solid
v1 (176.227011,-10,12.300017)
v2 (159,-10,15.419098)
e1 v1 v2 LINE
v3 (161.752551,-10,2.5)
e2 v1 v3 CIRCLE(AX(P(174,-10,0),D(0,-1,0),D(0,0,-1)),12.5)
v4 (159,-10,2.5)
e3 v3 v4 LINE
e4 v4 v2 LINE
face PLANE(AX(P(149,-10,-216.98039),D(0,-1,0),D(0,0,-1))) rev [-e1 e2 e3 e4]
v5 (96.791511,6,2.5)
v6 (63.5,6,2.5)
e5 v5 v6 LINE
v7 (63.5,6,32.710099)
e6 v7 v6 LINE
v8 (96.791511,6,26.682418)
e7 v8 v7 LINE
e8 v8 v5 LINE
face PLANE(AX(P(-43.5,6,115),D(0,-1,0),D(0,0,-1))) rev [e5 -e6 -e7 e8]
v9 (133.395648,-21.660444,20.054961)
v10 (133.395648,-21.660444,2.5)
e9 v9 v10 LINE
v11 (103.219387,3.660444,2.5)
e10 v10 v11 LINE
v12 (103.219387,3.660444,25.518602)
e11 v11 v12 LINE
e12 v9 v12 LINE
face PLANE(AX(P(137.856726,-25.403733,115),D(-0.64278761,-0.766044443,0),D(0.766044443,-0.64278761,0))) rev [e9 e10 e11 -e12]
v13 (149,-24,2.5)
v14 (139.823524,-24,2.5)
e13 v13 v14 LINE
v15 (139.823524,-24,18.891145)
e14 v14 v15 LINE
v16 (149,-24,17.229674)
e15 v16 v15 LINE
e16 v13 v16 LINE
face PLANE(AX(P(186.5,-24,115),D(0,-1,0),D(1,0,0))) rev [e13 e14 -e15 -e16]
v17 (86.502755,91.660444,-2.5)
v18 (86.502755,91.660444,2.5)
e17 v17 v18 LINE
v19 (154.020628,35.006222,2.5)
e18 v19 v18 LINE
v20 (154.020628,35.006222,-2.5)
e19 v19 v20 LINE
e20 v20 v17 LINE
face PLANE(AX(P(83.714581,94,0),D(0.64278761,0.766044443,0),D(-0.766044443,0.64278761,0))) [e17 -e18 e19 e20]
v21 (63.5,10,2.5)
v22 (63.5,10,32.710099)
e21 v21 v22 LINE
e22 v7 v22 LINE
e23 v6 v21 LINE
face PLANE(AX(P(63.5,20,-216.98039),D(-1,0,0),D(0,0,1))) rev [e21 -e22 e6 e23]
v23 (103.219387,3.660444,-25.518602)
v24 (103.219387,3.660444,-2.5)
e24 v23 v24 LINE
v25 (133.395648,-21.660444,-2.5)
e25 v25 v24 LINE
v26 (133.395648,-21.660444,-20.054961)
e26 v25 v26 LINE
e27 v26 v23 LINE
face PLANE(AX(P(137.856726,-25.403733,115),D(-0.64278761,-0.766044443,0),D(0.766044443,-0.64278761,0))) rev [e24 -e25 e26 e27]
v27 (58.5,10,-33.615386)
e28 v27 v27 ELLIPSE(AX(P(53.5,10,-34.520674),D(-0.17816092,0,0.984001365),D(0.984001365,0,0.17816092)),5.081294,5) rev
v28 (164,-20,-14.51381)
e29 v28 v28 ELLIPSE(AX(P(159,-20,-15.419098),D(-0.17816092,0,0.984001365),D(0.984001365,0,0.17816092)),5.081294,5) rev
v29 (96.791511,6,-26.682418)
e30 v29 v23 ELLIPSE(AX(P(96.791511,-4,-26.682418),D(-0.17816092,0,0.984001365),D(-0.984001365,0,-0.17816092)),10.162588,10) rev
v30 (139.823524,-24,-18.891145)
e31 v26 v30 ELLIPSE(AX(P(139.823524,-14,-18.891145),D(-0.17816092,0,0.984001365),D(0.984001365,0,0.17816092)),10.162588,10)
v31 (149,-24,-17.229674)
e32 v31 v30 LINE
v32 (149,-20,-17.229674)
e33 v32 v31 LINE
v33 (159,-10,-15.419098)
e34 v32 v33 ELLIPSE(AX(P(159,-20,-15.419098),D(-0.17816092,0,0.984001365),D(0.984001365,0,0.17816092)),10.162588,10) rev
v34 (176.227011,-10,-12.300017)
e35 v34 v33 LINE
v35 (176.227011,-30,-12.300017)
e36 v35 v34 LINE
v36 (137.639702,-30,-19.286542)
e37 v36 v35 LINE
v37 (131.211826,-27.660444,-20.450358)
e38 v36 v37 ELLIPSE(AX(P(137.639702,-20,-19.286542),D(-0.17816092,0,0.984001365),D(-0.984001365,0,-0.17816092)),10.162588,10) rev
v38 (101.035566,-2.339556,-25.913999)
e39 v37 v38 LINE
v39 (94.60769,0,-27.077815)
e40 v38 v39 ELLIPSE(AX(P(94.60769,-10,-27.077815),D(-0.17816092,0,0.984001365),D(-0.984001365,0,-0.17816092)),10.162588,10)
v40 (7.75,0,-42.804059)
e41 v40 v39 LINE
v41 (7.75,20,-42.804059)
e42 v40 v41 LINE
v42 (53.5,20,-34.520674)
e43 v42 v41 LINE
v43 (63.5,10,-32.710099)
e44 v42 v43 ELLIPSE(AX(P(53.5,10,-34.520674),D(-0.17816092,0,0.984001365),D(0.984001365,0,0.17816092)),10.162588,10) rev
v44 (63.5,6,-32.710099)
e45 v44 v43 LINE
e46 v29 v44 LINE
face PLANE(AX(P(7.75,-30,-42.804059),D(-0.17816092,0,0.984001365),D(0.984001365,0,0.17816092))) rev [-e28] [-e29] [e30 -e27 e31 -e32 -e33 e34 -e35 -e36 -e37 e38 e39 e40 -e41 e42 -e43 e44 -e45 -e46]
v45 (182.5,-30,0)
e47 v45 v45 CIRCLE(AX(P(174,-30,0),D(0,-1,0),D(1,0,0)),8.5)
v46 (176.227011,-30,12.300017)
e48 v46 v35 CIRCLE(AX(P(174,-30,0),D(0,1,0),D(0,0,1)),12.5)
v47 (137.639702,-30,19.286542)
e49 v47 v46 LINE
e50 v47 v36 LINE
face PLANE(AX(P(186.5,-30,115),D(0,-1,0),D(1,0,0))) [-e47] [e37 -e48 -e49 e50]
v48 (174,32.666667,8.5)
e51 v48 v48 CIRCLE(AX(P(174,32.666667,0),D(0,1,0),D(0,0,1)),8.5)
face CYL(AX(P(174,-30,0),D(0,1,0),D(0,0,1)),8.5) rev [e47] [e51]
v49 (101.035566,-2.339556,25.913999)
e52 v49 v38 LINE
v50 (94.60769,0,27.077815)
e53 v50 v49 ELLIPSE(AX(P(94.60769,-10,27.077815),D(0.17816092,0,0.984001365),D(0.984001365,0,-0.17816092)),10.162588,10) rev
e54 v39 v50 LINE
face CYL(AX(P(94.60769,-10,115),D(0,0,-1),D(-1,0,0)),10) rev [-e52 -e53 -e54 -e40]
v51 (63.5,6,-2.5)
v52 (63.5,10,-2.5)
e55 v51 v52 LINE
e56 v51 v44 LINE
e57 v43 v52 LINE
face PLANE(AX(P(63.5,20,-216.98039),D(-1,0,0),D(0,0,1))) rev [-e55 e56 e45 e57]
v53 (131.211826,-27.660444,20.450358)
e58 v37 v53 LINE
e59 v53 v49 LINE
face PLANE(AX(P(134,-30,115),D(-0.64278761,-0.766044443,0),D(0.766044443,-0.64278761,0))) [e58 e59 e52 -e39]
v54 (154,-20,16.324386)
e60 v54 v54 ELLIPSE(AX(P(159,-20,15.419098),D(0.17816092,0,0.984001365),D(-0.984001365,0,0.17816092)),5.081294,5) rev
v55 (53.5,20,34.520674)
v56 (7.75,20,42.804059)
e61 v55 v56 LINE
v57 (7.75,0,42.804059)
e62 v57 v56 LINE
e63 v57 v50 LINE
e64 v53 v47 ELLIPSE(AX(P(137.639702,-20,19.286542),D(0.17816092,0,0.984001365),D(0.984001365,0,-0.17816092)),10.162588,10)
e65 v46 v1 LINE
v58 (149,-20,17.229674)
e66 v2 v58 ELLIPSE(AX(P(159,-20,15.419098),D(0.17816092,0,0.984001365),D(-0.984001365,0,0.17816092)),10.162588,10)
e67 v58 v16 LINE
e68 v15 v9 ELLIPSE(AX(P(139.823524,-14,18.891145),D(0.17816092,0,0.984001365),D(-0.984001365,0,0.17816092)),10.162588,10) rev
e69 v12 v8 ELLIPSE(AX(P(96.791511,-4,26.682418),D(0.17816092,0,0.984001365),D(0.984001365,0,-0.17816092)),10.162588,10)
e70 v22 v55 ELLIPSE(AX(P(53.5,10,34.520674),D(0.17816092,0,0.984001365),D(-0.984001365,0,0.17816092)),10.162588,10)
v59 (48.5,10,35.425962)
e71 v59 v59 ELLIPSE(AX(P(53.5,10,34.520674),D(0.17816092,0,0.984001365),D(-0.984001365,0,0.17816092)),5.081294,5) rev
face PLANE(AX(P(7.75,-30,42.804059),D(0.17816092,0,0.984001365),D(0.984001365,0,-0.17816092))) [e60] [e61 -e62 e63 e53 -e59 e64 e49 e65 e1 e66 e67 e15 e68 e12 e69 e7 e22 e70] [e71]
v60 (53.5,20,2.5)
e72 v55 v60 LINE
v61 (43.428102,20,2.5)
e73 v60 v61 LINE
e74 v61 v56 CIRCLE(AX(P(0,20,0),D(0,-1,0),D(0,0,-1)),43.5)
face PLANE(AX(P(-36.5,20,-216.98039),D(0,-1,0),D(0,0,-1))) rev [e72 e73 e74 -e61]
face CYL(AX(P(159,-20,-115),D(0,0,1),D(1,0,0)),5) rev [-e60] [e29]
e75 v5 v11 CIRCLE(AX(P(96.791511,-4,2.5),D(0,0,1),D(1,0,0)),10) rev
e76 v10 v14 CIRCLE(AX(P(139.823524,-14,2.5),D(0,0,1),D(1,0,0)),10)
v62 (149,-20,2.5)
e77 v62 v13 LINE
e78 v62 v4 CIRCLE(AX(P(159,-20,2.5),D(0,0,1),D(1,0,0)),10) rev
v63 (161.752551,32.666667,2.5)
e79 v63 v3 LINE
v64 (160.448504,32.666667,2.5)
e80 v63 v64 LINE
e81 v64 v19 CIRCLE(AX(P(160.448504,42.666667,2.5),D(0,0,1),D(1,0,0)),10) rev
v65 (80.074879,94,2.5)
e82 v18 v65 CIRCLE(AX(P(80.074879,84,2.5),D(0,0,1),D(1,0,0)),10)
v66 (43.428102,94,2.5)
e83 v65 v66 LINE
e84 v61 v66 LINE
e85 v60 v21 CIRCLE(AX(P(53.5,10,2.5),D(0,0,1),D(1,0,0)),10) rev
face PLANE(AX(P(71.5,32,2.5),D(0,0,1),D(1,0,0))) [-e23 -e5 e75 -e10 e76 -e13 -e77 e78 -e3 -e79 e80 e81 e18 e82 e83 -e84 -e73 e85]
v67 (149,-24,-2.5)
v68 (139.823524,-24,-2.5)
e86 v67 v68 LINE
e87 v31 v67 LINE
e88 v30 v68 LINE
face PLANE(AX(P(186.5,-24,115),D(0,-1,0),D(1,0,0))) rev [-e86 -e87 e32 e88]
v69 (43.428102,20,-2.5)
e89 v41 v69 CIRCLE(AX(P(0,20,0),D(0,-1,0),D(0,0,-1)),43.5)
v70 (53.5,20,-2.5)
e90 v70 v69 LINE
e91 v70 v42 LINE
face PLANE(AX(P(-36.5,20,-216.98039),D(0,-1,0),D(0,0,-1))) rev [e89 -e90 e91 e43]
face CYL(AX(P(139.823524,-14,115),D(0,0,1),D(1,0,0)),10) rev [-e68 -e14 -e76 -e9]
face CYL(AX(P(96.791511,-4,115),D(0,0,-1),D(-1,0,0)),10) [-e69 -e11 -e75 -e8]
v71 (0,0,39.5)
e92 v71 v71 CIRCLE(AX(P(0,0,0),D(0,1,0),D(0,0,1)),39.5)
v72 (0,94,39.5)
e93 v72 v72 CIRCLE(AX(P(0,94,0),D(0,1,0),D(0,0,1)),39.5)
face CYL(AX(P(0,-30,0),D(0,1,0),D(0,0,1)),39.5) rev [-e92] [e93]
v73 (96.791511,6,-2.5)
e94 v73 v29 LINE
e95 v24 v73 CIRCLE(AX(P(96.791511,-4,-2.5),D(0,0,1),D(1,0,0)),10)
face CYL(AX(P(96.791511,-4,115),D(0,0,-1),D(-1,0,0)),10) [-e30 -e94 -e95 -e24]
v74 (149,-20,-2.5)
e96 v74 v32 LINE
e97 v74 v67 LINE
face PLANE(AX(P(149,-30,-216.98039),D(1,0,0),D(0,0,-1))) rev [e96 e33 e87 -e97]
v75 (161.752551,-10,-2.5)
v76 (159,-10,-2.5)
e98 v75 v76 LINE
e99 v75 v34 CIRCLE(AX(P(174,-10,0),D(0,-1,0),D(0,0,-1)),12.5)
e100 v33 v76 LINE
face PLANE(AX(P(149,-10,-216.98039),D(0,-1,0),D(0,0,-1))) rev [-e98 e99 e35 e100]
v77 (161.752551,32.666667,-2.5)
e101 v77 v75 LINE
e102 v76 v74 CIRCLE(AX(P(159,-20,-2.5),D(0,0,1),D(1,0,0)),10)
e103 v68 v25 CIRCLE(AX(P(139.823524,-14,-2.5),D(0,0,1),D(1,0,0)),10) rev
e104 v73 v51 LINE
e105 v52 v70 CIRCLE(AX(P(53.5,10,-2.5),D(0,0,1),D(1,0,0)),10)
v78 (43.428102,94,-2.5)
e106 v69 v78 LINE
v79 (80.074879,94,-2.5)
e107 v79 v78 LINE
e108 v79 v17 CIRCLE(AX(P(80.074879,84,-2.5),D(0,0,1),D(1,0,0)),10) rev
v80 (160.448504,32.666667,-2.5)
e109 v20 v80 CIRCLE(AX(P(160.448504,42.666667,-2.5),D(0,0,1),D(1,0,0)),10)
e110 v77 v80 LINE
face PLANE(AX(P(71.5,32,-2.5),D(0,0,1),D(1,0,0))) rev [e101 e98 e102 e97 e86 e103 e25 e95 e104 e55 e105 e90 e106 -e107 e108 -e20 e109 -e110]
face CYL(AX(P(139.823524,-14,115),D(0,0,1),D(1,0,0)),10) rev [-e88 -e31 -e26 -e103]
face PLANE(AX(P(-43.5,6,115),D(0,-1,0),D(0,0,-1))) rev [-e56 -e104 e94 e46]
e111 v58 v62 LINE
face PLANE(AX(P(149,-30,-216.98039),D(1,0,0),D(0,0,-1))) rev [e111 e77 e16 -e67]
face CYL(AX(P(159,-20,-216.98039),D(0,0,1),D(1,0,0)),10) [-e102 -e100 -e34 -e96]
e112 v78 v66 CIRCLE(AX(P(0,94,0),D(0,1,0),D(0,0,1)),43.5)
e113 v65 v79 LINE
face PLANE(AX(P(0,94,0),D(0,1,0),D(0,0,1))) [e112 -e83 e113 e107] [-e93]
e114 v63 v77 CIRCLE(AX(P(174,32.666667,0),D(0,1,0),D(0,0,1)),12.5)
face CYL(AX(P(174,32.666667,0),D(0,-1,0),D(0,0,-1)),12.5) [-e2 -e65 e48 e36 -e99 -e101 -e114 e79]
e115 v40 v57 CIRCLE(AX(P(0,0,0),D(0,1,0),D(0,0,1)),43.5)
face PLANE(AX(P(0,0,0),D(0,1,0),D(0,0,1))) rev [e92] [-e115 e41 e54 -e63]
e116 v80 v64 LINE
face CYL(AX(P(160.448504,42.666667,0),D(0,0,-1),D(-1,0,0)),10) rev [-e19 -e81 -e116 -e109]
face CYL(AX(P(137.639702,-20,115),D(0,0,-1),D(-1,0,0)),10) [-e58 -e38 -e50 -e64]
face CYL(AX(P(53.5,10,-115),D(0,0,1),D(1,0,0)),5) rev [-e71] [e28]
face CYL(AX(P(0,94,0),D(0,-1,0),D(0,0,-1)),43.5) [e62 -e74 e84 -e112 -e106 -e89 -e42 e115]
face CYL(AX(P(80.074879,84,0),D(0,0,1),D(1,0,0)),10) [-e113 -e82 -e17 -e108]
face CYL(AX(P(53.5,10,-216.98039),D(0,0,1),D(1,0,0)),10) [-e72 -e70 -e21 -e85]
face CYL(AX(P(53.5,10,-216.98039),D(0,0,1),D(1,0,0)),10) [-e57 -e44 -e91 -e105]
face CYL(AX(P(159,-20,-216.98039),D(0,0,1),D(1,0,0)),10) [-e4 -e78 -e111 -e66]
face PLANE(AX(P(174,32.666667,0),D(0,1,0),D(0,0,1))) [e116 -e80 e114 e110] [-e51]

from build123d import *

# Parameters (mm, degrees)
SKETCH2_R                = 43.5
BOSS_EXTRUDE1_DEPTH      = 94
BOSS_EXTRUDE2_START      = -30
SKETCH2_3_R              = 12.5
BOSS_EXTRUDE2_DEPTH      = 62.666667
EXTRUDE_THIN1_DEPTH      = 115
BOSS_EXTRUDE3_START      = -230
SKETCH5_W                = 100
SKETCH5_H                = 20
SKETCH5_W_2              = 50
BOSS_EXTRUDE3_DEPTH      = 230
CUT_EXTRUDE2_DEPTH       = 319.334729
CUT_EXTRUDE2_DEPTH_BACK  = 319.334729
SKETCH5_3_R              = 5
CUT_EXTRUDE1_START       = -30
CUT_EXTRUDE1_OUTLINE_R   = 8.5
CUT_EXTRUDE1_OUTLINE_R_2 = 39.5
CUT_EXTRUDE1_DEPTH       = 124
RIB1_START               = -2.5
RIB1_DEPTH               = 5
FILLET1_R                = 10


# Read off the part's stored shape, not the designer's step: Cut-Extrude1, Rib1
with BuildPart() as part:
    # Sketch2 → Boss-Extrude1 (new body)
    with BuildSketch(Plane(origin=(0, 0, 0), x_dir=(1, 0, 0), z_dir=(0, 1, 0))):
        with Locations(Location((0, 0, 0), (0, 0, 270))):
            Circle(SKETCH2_R)
    extrude(amount=BOSS_EXTRUDE1_DEPTH)



with BuildPart() as body_2:
    # Sketch2<3> → Boss-Extrude2 (new body)
    with BuildSketch(Plane(origin=(0, 0, 0), x_dir=(1, 0, 0), z_dir=(0, 1, 0)).offset(BOSS_EXTRUDE2_START)):
        with Locations(Location((174, 0, 0), (0, 0, 270))):
            Circle(SKETCH2_3_R)
    extrude(amount=BOSS_EXTRUDE2_DEPTH)


with BuildPart() as part_1:
    add(part.part)

    add(body_2.part)  # Extrude-Thin1 merges body 2
    # Sketch3 → Extrude-Thin1 (add, symmetric)
    with BuildSketch(Plane.XY):
        Polygon((-43.5, 0), (98.247392, 0), (134, -30), (186.5, -30), (186.5, -24), (136.183821, -24), (100.431214, 6), (-43.5, 6), align=None)
    extrude(amount=EXTRUDE_THIN1_DEPTH, both=True)

    # Sketch5 → Boss-Extrude3 (add)
    with BuildSketch(Plane.XY.offset(115).offset(BOSS_EXTRUDE3_START)):
        with Locations((13.5, 10)):
            Rectangle(SKETCH5_W, SKETCH5_H)
        with Locations((174, -20)):
            Rectangle(SKETCH5_W_2, SKETCH5_H)
    extrude(amount=BOSS_EXTRUDE3_DEPTH)

    # Sketch5<3> → Cut-Extrude2 (cut, two sides: drawn at the far end of the back side and taken through both)
    with BuildSketch(Plane.XY.offset(115).offset(-CUT_EXTRUDE2_DEPTH_BACK)):
        with Locations((53.5, 10)):
            Circle(SKETCH5_3_R)
        with Locations((159, -20)):
            Circle(SKETCH5_3_R)
    extrude(amount=CUT_EXTRUDE2_DEPTH + CUT_EXTRUDE2_DEPTH_BACK, mode=Mode.SUBTRACT)

    # Cut-Extrude1 outline → Cut-Extrude1 (cut)
    with BuildSketch(Plane(origin=(0, 0, 0), x_dir=(1, 0, 0), z_dir=(0, 1, 0)).offset(CUT_EXTRUDE1_START)):
        with Locations((174, 0)):
            Circle(CUT_EXTRUDE1_OUTLINE_R)
        with BuildLine():
            ThreePointArc((-36.5, 23.664319), (-17.269135, 39.925267), (7.75, 42.804059))
            Line((7.75, 42.804059), (63.5, 32.710099))
            Line((63.5, 32.710099), (63.5, 115))
            Line((63.5, 115), (-36.5, 115))
            Line((-36.5, 115), (-36.5, 23.664319))
        make_face()
        with BuildLine():
            Line((63.5, -32.710099), (7.75, -42.804059))
            ThreePointArc((7.75, -42.804059), (-17.269135, -39.925267), (-36.5, -23.664319))
            Line((-36.5, -23.664319), (-36.5, -115))
            Line((-36.5, -115), (63.5, -115))
            Line((63.5, -115), (63.5, -32.710099))
        make_face()
        with BuildLine():
            ThreePointArc((-43.5, 0), (-41.713307, 12.338963), (-36.5, 23.664319))
            Line((-36.5, 23.664319), (-36.5, 115))
            Line((-36.5, 115), (-43.5, 115))
            Line((-43.5, 115), (-43.5, 0))
        make_face()
        Polygon((63.5, 115), (63.5, 32.710099), (149, 17.229674), (149, 115), align=None)
        with BuildLine():
            Line((-36.5, -115), (-36.5, -23.664319))
            ThreePointArc((-36.5, -23.664319), (-41.713307, -12.338963), (-43.5, 0))
            Line((-43.5, 0), (-43.5, -115))
            Line((-43.5, -115), (-36.5, -115))
        make_face()
        Polygon((149, -17.229674), (63.5, -32.710099), (63.5, -115), (149, -115), align=None)
        with BuildLine():
            Line((149, 115), (149, 17.229674))
            Line((149, 17.229674), (176.227011, 12.300017))
            ThreePointArc((176.227011, 12.300017), (183.593947, 8.012876), (186.5, 0))
            ThreePointArc((186.5, 0), (183.593947, -8.012876), (176.227011, -12.300017))
            Line((176.227011, -12.300017), (149, -17.229674))
            Line((149, -17.229674), (149, -115))
            Line((149, -115), (199, -115))
            Line((199, -115), (199, 115))
            Line((199, 115), (149, 115))
        make_face()
        Circle(CUT_EXTRUDE1_OUTLINE_R_2)
    extrude(amount=CUT_EXTRUDE1_DEPTH, mode=Mode.SUBTRACT)

    # Rib1 outline → Rib1 (add)
    with BuildSketch(Plane.XY.offset(RIB1_START)):
        Polygon((156.808801, 32.666667), (83.714581, 94), (42, 94), (42, 20), (63.5, 20), (63.5, 6), (100.431214, 6), (136.183821, -24), (149, -24), (149, -10), (163, -10), (163, 32.666667), align=None)
    extrude(amount=RIB1_DEPTH)

    # Fillet1
    # the kernel refuses this fillet: 10 mm, written as the material it adds along each edge
    with BuildSketch(Plane(origin=(98.247392, 0, -35.518075), x_dir=(-1, 0, 0), z_dir=(0, 0, 1))) as fillet1_piece_1_section:
        with BuildLine():
            CenterArc((FILLET1_R * 0.363970234266, FILLET1_R), FILLET1_R, 230, 40)
            Line((-FILLET1_R * 0.27881737542, FILLET1_R * 0.233955556881), (0, 0))
            Line((0, 0), (FILLET1_R * 0.363970234266, 0))
        make_face()
    fillet1_piece_1 = extrude(amount=71.03615, mode=Mode.PRIVATE)
    fillet1_piece_1 = split(fillet1_piece_1, bisect_by=Plane(origin=(102.693133, -0.478631, -25.613884), z_dir=(-0.17816091954075147, 0, 0.9840013652167328)), keep=Keep.TOP, mode=Mode.PRIVATE)
    fillet1_piece_1 = split(fillet1_piece_1, bisect_by=Plane(origin=(102.693133, -0.478631, 25.613884), z_dir=(-0.17816091954075147, 0, -0.9840013652167328)), keep=Keep.TOP, mode=Mode.PRIVATE)
    add(fillet1_piece_1)
    with BuildSketch(Plane(origin=(136.183821, -24, -6.599256), x_dir=(-0.7660444431189806, 0.6427876096865363, 0), z_dir=(0, 0, 1))) as fillet1_piece_2_section:
        with BuildLine():
            CenterArc((FILLET1_R * 0.363970234266, -FILLET1_R), FILLET1_R, 90, 40)
            Line((-FILLET1_R * 0.27881737542, -FILLET1_R * 0.233955556881), (0, 0))
            Line((0, 0), (FILLET1_R * 0.363970234266, 0))
        make_face()
    fillet1_piece_2 = extrude(amount=35.248652, mode=Mode.PRIVATE)
    fillet1_piece_2 = split(fillet1_piece_2, bisect_by=Plane(origin=(140.141098, -23.515892, 18.833646), z_dir=(-0.17816091954075147, 0, -0.9840013652167328)), keep=Keep.TOP, mode=Mode.PRIVATE)
    add(fillet1_piece_2)
    with BuildSketch(Plane(origin=(136.183821, -24, -28.649397), x_dir=(1, 0, 0), z_dir=(0, 0, 1))) as fillet1_piece_3_section:
        with BuildLine():
            CenterArc((FILLET1_R * 0.363970234266, FILLET1_R), FILLET1_R, 230, 40)
            Line((-FILLET1_R * 0.27881737542, FILLET1_R * 0.233955556881), (0, 0))
            Line((0, 0), (FILLET1_R * 0.363970234266, 0))
        make_face()
    fillet1_piece_3 = extrude(amount=35.248652, mode=Mode.PRIVATE)
    fillet1_piece_3 = split(fillet1_piece_3, bisect_by=Plane(origin=(137.827829, -23.50738, -19.252481), z_dir=(-0.17816091954075147, 0, 0.9840013652167328)), keep=Keep.TOP, mode=Mode.PRIVATE)
    add(fillet1_piece_3)
    with BuildSketch(Plane(origin=(156.808801, 32.666667, -2.5), x_dir=(1, 0, 0), z_dir=(0, 0, 1))) as fillet1_piece_4:
        with BuildLine():
            CenterArc((FILLET1_R * 0.363970234268, FILLET1_R), FILLET1_R, 230, 40)
            Line((-FILLET1_R * 0.278817375421, FILLET1_R * 0.233955556883), (0, 0))
            Line((0, 0), (FILLET1_R * 0.363970234268, 0))
        make_face()
    extrude(amount=5)
    # the kernel refuses this fillet: 10 mm, written as the material it takes off along each edge
    with BuildSketch(Plane(origin=(100.431214, 6, 35.122678), x_dir=(-1, 0, 0), z_dir=(0, 0, -1))) as fillet1_2_piece_1:
        with BuildLine():
            CenterArc((FILLET1_R * 0.363970234266, -FILLET1_R), FILLET1_R, 90, 40)
            Line((-FILLET1_R * 0.27881737542, -FILLET1_R * 0.233955556881), (0, 0))
            Line((0, 0), (FILLET1_R * 0.363970234266, 0))
        make_face()
    extrude(amount=32.622678, mode=Mode.SUBTRACT)
    with BuildSketch(Plane(origin=(100.431214, 6, 35.122678), x_dir=(-1, 0, 0), z_dir=(0, 0, -1))) as fillet1_2_piece_2_section:
        with BuildLine():
            CenterArc((FILLET1_R * 0.363970234266, -FILLET1_R), FILLET1_R, 90, 40)
            Line((-FILLET1_R * 0.27881737542, -FILLET1_R * 0.233955556881), (0, 0))
            Line((0, 0), (FILLET1_R * 0.363970234266, 0))
        make_face()
    fillet1_2_piece_2 = extrude(amount=41.721934, mode=Mode.PRIVATE)
    fillet1_2_piece_2 = split(fillet1_2_piece_2, bisect_by=Plane(origin=(100.255013, 5.515892, -2.5), z_dir=(0, 0, -1)), keep=Keep.TOP, mode=Mode.PRIVATE)
    add(fillet1_2_piece_2, mode=Mode.SUBTRACT)
    with BuildSketch(Plane(origin=(134, -30, -29.044794), x_dir=(-0.766044443118982, 0.6427876096865346, 0), z_dir=(0, 0, 1))) as fillet1_2_piece_3:
        with BuildLine():
            CenterArc((FILLET1_R * 0.363970234266, -FILLET1_R), FILLET1_R, 90, 40)
            Line((-FILLET1_R * 0.27881737542, -FILLET1_R * 0.233955556881), (0, 0))
            Line((0, 0), (FILLET1_R * 0.363970234266, 0))
        make_face()
    extrude(amount=58.089588, mode=Mode.SUBTRACT)
    with BuildSketch(Plane(origin=(149, -10, -22.5), x_dir=(0, -1, 0), z_dir=(0, 0, 1))) as fillet1_2_piece_4_section:
        with BuildLine():
            CenterArc((FILLET1_R, FILLET1_R), FILLET1_R, 180, 90)
            Line((0, FILLET1_R), (0, 0))
            Line((0, 0), (FILLET1_R, 0))
        make_face()
    fillet1_2_piece_4 = extrude(amount=64.729674, mode=Mode.PRIVATE)
    fillet1_2_piece_4 = split(fillet1_2_piece_4, bisect_by=Plane(origin=(151.263951, -12.263951, -2.5), z_dir=(0, 0, -1)), keep=Keep.TOP, mode=Mode.PRIVATE)
    add(fillet1_2_piece_4, mode=Mode.SUBTRACT)
    with BuildSketch(Plane(origin=(149, -10, 2.5), x_dir=(0, -1, 0), z_dir=(0, 0, 1))) as fillet1_2_piece_5:
        with BuildLine():
            CenterArc((FILLET1_R, FILLET1_R), FILLET1_R, 180, 90)
            Line((0, FILLET1_R), (0, 0))
            Line((0, 0), (FILLET1_R, 0))
        make_face()
    extrude(amount=39.729674, mode=Mode.SUBTRACT)
    with BuildSketch(Plane(origin=(100.431214, 6, 6.599256), x_dir=(0.7660444431189812, -0.6427876096865356, 0), z_dir=(0, 0, -1))) as fillet1_2_piece_6_section:
        with BuildLine():
            CenterArc((FILLET1_R * 0.363970234266, FILLET1_R), FILLET1_R, 230, 40)
            Line((-FILLET1_R * 0.27881737542, FILLET1_R * 0.233955556881), (0, 0))
            Line((0, 0), (FILLET1_R * 0.363970234266, 0))
        make_face()
    fillet1_2_piece_6 = extrude(amount=41.721934, mode=Mode.PRIVATE)
    fillet1_2_piece_6 = split(fillet1_2_piece_6, bisect_by=Plane(origin=(100.255013, 5.515892, 2.5), z_dir=(0, 0, 1)), keep=Keep.TOP, mode=Mode.PRIVATE)
    add(fillet1_2_piece_6, mode=Mode.SUBTRACT)
    with BuildSketch(Plane(origin=(100.431214, 6, -2.5), x_dir=(0.7660444431189812, -0.6427876096865356, 0), z_dir=(0, 0, -1))) as fillet1_2_piece_7:
        with BuildLine():
            CenterArc((FILLET1_R * 0.363970234266, FILLET1_R), FILLET1_R, 230, 40)
            Line((-FILLET1_R * 0.27881737542, FILLET1_R * 0.233955556881), (0, 0))
            Line((0, 0), (FILLET1_R * 0.363970234266, 0))
        make_face()
    extrude(amount=32.622678, mode=Mode.SUBTRACT)
    with BuildSketch(Plane(origin=(63.5, 20, -22.5), x_dir=(-1, 0, 0), z_dir=(0, 0, 1))) as fillet1_2_piece_8_section:
        with BuildLine():
            CenterArc((FILLET1_R, FILLET1_R), FILLET1_R, 180, 90)
            Line((0, FILLET1_R), (0, 0))
            Line((0, 0), (FILLET1_R, 0))
        make_face()
    fillet1_2_piece_8 = extrude(amount=80.210099, mode=Mode.PRIVATE)
    fillet1_2_piece_8 = split(fillet1_2_piece_8, bisect_by=Plane(origin=(61.236049, 17.736049, -2.5), z_dir=(0, 0, -1)), keep=Keep.TOP, mode=Mode.PRIVATE)
    add(fillet1_2_piece_8, mode=Mode.SUBTRACT)
    with BuildSketch(Plane(origin=(63.5, 20, 2.5), x_dir=(-1, 0, 0), z_dir=(0, 0, 1))) as fillet1_2_piece_9:
        with BuildLine():
            CenterArc((FILLET1_R, FILLET1_R), FILLET1_R, 180, 90)
            Line((0, FILLET1_R), (0, 0))
            Line((0, 0), (FILLET1_R, 0))
        make_face()
    extrude(amount=55.210099, mode=Mode.SUBTRACT)
    with BuildSketch(Plane(origin=(83.714581, 94, -11.599256), x_dir=(-1, 0, 0), z_dir=(0, 0, 1))) as fillet1_2_piece_10:
        with BuildLine():
            CenterArc((FILLET1_R * 0.363970234268, FILLET1_R), FILLET1_R, 230, 40)
            Line((-FILLET1_R * 0.278817375421, FILLET1_R * 0.233955556883), (0, 0))
            Line((0, 0), (FILLET1_R * 0.363970234268, 0))
        make_face()
    extrude(amount=23.198512, mode=Mode.SUBTRACT)
    with BuildSketch(Plane(origin=(149, -10, -42.229674), x_dir=(1, 0, 0), z_dir=(0, 0, 1))) as fillet1_2_piece_11:
        with BuildLine():
            CenterArc((FILLET1_R, -FILLET1_R), FILLET1_R, 90, 90)
            Line((0, -FILLET1_R), (0, 0))
            Line((0, 0), (FILLET1_R, 0))
        make_face()
    extrude(amount=39.729674, mode=Mode.SUBTRACT)
    with BuildSketch(Plane(origin=(149, -10, -42.229674), x_dir=(1, 0, 0), z_dir=(0, 0, 1))) as fillet1_2_piece_12_section:
        with BuildLine():
            CenterArc((FILLET1_R, -FILLET1_R), FILLET1_R, 90, 90)
            Line((0, -FILLET1_R), (0, 0))
            Line((0, 0), (FILLET1_R, 0))
        make_face()
    fillet1_2_piece_12 = extrude(amount=64.729674, mode=Mode.PRIVATE)
    fillet1_2_piece_12 = split(fillet1_2_piece_12, bisect_by=Plane(origin=(151.263951, -12.263951, 2.5), z_dir=(0, 0, 1)), keep=Keep.TOP, mode=Mode.PRIVATE)
    add(fillet1_2_piece_12, mode=Mode.SUBTRACT)
    with BuildSketch(Plane(origin=(63.5, 20, -57.710099), x_dir=(0, -1, 0), z_dir=(0, 0, 1))) as fillet1_2_piece_13:
        with BuildLine():
            CenterArc((FILLET1_R, -FILLET1_R), FILLET1_R, 90, 90)
            Line((0, -FILLET1_R), (0, 0))
            Line((0, 0), (FILLET1_R, 0))
        make_face()
    extrude(amount=55.210099, mode=Mode.SUBTRACT)
    with BuildSketch(Plane(origin=(63.5, 20, -57.710099), x_dir=(0, -1, 0), z_dir=(0, 0, 1))) as fillet1_2_piece_14_section:
        with BuildLine():
            CenterArc((FILLET1_R, -FILLET1_R), FILLET1_R, 90, 90)
            Line((0, -FILLET1_R), (0, 0))
            Line((0, 0), (FILLET1_R, 0))
        make_face()
    fillet1_2_piece_14 = extrude(amount=80.210099, mode=Mode.PRIVATE)
    fillet1_2_piece_14 = split(fillet1_2_piece_14, bisect_by=Plane(origin=(61.236049, 17.736049, 2.5), z_dir=(0, 0, 1)), keep=Keep.TOP, mode=Mode.PRIVATE)
    add(fillet1_2_piece_14, mode=Mode.SUBTRACT)


solid = part_1.part
